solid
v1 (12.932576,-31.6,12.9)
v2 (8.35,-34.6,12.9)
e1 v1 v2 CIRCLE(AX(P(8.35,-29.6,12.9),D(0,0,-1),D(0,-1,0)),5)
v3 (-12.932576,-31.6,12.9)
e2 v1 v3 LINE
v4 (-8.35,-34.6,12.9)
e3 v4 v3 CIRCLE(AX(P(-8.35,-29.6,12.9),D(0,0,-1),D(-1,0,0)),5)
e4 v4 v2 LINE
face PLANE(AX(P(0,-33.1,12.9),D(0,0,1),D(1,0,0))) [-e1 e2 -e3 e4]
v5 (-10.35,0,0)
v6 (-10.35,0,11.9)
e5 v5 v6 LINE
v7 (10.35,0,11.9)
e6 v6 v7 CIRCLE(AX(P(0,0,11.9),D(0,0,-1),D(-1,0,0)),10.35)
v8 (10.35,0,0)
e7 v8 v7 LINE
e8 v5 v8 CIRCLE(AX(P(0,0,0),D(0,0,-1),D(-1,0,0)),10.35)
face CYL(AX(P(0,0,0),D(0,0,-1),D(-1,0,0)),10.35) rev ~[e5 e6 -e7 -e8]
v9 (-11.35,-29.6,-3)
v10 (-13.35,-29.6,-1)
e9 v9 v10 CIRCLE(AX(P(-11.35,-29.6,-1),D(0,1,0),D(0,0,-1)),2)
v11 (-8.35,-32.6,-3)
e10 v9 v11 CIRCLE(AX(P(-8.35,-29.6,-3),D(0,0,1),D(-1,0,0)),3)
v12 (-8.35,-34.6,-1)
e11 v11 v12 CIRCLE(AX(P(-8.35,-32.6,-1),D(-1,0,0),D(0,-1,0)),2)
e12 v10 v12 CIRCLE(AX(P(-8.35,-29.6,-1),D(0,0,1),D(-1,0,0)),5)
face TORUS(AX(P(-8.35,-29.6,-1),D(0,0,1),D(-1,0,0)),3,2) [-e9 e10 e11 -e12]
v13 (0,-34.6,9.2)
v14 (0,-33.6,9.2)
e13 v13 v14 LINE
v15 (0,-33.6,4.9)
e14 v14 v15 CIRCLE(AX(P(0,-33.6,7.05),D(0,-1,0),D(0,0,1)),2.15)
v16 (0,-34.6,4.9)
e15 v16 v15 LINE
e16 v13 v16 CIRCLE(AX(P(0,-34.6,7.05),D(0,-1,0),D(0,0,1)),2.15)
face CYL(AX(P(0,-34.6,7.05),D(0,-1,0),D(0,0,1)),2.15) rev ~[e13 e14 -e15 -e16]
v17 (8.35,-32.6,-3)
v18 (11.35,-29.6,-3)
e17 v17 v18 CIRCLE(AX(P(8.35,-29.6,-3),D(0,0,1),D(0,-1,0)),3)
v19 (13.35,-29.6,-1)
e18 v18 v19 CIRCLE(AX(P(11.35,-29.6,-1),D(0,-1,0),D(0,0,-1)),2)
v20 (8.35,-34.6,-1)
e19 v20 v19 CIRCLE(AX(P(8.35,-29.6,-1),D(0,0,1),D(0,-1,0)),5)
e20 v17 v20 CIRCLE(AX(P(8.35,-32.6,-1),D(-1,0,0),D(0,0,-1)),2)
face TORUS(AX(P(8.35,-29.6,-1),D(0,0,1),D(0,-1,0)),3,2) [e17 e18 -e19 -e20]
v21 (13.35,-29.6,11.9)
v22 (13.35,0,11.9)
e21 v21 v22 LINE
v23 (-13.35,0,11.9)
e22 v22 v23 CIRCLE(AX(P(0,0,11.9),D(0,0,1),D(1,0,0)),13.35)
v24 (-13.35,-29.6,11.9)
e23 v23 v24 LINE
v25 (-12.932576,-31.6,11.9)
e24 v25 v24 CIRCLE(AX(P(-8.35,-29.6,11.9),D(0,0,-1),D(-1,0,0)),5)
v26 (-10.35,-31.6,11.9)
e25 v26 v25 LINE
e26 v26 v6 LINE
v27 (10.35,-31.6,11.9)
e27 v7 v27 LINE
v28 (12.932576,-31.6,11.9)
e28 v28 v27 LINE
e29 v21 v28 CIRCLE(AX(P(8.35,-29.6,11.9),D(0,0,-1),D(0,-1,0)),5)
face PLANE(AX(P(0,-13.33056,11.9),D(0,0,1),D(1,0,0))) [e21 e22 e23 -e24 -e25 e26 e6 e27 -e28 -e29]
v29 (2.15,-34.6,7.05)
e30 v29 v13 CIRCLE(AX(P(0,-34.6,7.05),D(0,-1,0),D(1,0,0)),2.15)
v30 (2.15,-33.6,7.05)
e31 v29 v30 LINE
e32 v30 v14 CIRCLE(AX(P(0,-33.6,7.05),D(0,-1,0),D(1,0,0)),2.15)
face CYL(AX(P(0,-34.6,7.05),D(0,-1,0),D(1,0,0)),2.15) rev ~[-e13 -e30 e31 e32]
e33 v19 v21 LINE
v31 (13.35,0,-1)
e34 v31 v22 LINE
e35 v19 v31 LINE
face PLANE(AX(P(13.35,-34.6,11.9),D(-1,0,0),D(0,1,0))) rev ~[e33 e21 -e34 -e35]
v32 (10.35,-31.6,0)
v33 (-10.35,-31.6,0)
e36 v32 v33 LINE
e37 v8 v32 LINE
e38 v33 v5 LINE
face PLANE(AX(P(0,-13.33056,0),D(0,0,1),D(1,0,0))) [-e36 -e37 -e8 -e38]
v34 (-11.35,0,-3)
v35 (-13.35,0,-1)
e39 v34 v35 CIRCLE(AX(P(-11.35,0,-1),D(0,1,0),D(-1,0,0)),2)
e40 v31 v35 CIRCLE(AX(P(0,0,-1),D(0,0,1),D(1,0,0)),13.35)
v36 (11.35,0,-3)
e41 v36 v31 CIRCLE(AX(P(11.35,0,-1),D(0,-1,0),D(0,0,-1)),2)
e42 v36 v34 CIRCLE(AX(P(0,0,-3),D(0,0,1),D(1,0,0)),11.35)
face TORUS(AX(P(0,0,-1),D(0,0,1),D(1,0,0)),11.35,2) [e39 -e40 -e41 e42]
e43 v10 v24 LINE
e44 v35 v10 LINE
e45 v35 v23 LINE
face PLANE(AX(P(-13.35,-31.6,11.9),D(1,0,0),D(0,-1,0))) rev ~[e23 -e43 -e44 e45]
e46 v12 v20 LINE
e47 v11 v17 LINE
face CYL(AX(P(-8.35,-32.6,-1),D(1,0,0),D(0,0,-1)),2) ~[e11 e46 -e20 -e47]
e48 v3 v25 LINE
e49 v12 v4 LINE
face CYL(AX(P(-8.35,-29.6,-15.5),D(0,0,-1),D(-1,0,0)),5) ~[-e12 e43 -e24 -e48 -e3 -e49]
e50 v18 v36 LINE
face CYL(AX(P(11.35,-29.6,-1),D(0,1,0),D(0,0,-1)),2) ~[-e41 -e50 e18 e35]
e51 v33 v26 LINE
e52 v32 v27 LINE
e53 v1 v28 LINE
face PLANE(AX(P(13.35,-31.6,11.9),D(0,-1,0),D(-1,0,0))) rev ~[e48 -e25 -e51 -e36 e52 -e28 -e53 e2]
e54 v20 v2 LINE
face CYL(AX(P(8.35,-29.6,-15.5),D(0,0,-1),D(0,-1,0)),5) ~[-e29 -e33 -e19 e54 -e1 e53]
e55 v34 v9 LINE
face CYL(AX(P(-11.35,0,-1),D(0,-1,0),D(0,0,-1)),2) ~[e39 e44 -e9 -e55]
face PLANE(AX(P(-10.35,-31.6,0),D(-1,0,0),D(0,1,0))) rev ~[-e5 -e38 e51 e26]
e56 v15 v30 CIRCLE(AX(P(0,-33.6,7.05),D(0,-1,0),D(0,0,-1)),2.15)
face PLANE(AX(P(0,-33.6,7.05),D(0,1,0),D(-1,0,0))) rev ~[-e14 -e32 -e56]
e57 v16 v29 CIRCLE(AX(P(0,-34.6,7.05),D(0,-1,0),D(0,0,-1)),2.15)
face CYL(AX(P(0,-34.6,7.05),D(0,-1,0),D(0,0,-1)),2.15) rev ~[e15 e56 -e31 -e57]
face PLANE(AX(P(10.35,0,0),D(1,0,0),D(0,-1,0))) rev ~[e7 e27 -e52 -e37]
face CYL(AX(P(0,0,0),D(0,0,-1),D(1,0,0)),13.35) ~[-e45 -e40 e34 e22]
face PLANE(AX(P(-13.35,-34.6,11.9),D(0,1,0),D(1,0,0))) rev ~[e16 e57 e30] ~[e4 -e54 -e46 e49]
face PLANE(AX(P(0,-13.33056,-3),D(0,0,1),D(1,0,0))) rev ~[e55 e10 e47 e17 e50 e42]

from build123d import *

# Parameters (mm, degrees)
F1_DEPTH    = 3
F2_DEPTH    = 11.9
F4_DEPTH    = 1
F6_DEPTH    = 6
F7_T1_DEPTH = 40.9
F8_R        = 2
F9_R        = 3.5272638361
F10_DEPTH   = 1
F11_DEPTH   = 1


# Not quite as in the source:
# - a fillet or chamfer that OpenCascade refuses, or shapes differently, is made with other operations: its cross-section is extruded or revolved along the edge and cut away or added


with BuildPart() as f1:
    # F0 (on Top) → F1 (new body)
    with BuildSketch(Plane.XY):
        with BuildLine():
            Line((13.35, -34.6), (13.35, 0))
            ThreePointArc((13.35, 0), (0, 13.35), (-13.35, 0))
            Line((-13.35, 0), (-13.35, -34.6))
            Line((-13.35, -34.6), (13.35, -34.6))
        make_face()
        with BuildLine():
            Line((-10.35, -31.6), (-10.35, 0))
            ThreePointArc((-10.35, 0), (0, 10.35), (10.35, 0))
            Line((10.35, 0), (10.35, -31.6))
            Line((10.35, -31.6), (-10.35, -31.6))
        make_face(mode=Mode.SUBTRACT)
        with BuildLine():
            ThreePointArc((10.35, 0), (0, 10.35), (-10.35, 0))
            Line((-10.35, 0), (-10.35, -31.6))
            Line((-10.35, -31.6), (10.35, -31.6))
            Line((10.35, -31.6), (10.35, 0))
        make_face()
    extrude(amount=-F1_DEPTH)

    # F0 (on Top) → F2 (join)
    with BuildSketch(Plane.XY):
        with BuildLine():
            Line((13.35, -34.6), (13.35, 0))
            ThreePointArc((13.35, 0), (0, 13.35), (-13.35, 0))
            Line((-13.35, 0), (-13.35, -34.6))
            Line((-13.35, -34.6), (13.35, -34.6))
        make_face()
        with BuildLine():
            Line((-10.35, -31.6), (-10.35, 0))
            ThreePointArc((-10.35, 0), (0, 10.35), (10.35, 0))
            Line((10.35, 0), (10.35, -31.6))
            Line((10.35, -31.6), (-10.35, -31.6))
        make_face(mode=Mode.SUBTRACT)
    extrude(amount=F2_DEPTH)

    # F3 (on face) → F4 (join)
    with BuildSketch(Plane.XY.offset(11.9)):
        Polygon((-13.35, -34.6), (13.35, -34.6), (13.35, -31.6), (10.35, -31.6), (-10.35, -31.6), (-13.35, -31.6), align=None)
    extrude(amount=F4_DEPTH)

    # F5 (on face) → F6 (cut)
    with BuildSketch(Plane.XZ.offset(34.6)):
        with BuildLine():
            ThreePointArc((0, 9.2), (-2.15, 7.05), (0, 4.9))
            Line((0, 4.9), (0, 9.2))
        make_face()
        with BuildLine():
            Line((0, 9.2), (0, 4.9))
            ThreePointArc((0, 4.9), (1.5202795796, 5.5297204204), (2.15, 7.05))
            ThreePointArc((2.15, 7.05), (1.5202795796, 8.5702795796), (0, 9.2))
        make_face()
    extrude(amount=-F6_DEPTH, mode=Mode.SUBTRACT)

    # F7: fillet of radius 5 on 2 edges, made by hand

    # F7_s2 → F7_t1 (cut)
    with BuildSketch(Plane.XY.offset(-15.5)):
        with BuildLine():
            ThreePointArc((-13.35, -29.6), (-11.8855339059, -33.1355339059), (-8.35, -34.6))
            Line((-8.35, -34.6), (-13.35, -34.6))
            Line((-13.35, -34.6), (-13.35, -29.6))
        make_face()
        with BuildLine():
            ThreePointArc((8.35, -34.6), (11.8855339059, -33.1355339059), (13.35, -29.6))
            Line((13.35, -29.6), (13.35, -34.6))
            Line((13.35, -34.6), (8.35, -34.6))
        make_face()
    extrude(amount=F7_T1_DEPTH, mode=Mode.SUBTRACT)

    # F8
    f8_edges = [f1.edges().sort_by_distance(p)[0] for p in [
        (13.35, -14.8, -3),
    ]]
    fillet(f8_edges, radius=F8_R)

    # F9 (on face) → F10 (join)
    with BuildSketch(Plane(origin=(0, -31.6, 0), x_dir=(-1, 0, 0), z_dir=(0, 1, 0))):
        with Locations((0, 7.05)):
            Circle(F9_R)
    extrude(amount=-F10_DEPTH)

    # F11 (add): a face of the model
    f11_faces = [f1.faces().sort_by_distance(p)[0] for p in [
        (0, -32.6, 7.05),
    ]]
    extrude(f11_faces, amount=F11_DEPTH)


solid = f1.part
